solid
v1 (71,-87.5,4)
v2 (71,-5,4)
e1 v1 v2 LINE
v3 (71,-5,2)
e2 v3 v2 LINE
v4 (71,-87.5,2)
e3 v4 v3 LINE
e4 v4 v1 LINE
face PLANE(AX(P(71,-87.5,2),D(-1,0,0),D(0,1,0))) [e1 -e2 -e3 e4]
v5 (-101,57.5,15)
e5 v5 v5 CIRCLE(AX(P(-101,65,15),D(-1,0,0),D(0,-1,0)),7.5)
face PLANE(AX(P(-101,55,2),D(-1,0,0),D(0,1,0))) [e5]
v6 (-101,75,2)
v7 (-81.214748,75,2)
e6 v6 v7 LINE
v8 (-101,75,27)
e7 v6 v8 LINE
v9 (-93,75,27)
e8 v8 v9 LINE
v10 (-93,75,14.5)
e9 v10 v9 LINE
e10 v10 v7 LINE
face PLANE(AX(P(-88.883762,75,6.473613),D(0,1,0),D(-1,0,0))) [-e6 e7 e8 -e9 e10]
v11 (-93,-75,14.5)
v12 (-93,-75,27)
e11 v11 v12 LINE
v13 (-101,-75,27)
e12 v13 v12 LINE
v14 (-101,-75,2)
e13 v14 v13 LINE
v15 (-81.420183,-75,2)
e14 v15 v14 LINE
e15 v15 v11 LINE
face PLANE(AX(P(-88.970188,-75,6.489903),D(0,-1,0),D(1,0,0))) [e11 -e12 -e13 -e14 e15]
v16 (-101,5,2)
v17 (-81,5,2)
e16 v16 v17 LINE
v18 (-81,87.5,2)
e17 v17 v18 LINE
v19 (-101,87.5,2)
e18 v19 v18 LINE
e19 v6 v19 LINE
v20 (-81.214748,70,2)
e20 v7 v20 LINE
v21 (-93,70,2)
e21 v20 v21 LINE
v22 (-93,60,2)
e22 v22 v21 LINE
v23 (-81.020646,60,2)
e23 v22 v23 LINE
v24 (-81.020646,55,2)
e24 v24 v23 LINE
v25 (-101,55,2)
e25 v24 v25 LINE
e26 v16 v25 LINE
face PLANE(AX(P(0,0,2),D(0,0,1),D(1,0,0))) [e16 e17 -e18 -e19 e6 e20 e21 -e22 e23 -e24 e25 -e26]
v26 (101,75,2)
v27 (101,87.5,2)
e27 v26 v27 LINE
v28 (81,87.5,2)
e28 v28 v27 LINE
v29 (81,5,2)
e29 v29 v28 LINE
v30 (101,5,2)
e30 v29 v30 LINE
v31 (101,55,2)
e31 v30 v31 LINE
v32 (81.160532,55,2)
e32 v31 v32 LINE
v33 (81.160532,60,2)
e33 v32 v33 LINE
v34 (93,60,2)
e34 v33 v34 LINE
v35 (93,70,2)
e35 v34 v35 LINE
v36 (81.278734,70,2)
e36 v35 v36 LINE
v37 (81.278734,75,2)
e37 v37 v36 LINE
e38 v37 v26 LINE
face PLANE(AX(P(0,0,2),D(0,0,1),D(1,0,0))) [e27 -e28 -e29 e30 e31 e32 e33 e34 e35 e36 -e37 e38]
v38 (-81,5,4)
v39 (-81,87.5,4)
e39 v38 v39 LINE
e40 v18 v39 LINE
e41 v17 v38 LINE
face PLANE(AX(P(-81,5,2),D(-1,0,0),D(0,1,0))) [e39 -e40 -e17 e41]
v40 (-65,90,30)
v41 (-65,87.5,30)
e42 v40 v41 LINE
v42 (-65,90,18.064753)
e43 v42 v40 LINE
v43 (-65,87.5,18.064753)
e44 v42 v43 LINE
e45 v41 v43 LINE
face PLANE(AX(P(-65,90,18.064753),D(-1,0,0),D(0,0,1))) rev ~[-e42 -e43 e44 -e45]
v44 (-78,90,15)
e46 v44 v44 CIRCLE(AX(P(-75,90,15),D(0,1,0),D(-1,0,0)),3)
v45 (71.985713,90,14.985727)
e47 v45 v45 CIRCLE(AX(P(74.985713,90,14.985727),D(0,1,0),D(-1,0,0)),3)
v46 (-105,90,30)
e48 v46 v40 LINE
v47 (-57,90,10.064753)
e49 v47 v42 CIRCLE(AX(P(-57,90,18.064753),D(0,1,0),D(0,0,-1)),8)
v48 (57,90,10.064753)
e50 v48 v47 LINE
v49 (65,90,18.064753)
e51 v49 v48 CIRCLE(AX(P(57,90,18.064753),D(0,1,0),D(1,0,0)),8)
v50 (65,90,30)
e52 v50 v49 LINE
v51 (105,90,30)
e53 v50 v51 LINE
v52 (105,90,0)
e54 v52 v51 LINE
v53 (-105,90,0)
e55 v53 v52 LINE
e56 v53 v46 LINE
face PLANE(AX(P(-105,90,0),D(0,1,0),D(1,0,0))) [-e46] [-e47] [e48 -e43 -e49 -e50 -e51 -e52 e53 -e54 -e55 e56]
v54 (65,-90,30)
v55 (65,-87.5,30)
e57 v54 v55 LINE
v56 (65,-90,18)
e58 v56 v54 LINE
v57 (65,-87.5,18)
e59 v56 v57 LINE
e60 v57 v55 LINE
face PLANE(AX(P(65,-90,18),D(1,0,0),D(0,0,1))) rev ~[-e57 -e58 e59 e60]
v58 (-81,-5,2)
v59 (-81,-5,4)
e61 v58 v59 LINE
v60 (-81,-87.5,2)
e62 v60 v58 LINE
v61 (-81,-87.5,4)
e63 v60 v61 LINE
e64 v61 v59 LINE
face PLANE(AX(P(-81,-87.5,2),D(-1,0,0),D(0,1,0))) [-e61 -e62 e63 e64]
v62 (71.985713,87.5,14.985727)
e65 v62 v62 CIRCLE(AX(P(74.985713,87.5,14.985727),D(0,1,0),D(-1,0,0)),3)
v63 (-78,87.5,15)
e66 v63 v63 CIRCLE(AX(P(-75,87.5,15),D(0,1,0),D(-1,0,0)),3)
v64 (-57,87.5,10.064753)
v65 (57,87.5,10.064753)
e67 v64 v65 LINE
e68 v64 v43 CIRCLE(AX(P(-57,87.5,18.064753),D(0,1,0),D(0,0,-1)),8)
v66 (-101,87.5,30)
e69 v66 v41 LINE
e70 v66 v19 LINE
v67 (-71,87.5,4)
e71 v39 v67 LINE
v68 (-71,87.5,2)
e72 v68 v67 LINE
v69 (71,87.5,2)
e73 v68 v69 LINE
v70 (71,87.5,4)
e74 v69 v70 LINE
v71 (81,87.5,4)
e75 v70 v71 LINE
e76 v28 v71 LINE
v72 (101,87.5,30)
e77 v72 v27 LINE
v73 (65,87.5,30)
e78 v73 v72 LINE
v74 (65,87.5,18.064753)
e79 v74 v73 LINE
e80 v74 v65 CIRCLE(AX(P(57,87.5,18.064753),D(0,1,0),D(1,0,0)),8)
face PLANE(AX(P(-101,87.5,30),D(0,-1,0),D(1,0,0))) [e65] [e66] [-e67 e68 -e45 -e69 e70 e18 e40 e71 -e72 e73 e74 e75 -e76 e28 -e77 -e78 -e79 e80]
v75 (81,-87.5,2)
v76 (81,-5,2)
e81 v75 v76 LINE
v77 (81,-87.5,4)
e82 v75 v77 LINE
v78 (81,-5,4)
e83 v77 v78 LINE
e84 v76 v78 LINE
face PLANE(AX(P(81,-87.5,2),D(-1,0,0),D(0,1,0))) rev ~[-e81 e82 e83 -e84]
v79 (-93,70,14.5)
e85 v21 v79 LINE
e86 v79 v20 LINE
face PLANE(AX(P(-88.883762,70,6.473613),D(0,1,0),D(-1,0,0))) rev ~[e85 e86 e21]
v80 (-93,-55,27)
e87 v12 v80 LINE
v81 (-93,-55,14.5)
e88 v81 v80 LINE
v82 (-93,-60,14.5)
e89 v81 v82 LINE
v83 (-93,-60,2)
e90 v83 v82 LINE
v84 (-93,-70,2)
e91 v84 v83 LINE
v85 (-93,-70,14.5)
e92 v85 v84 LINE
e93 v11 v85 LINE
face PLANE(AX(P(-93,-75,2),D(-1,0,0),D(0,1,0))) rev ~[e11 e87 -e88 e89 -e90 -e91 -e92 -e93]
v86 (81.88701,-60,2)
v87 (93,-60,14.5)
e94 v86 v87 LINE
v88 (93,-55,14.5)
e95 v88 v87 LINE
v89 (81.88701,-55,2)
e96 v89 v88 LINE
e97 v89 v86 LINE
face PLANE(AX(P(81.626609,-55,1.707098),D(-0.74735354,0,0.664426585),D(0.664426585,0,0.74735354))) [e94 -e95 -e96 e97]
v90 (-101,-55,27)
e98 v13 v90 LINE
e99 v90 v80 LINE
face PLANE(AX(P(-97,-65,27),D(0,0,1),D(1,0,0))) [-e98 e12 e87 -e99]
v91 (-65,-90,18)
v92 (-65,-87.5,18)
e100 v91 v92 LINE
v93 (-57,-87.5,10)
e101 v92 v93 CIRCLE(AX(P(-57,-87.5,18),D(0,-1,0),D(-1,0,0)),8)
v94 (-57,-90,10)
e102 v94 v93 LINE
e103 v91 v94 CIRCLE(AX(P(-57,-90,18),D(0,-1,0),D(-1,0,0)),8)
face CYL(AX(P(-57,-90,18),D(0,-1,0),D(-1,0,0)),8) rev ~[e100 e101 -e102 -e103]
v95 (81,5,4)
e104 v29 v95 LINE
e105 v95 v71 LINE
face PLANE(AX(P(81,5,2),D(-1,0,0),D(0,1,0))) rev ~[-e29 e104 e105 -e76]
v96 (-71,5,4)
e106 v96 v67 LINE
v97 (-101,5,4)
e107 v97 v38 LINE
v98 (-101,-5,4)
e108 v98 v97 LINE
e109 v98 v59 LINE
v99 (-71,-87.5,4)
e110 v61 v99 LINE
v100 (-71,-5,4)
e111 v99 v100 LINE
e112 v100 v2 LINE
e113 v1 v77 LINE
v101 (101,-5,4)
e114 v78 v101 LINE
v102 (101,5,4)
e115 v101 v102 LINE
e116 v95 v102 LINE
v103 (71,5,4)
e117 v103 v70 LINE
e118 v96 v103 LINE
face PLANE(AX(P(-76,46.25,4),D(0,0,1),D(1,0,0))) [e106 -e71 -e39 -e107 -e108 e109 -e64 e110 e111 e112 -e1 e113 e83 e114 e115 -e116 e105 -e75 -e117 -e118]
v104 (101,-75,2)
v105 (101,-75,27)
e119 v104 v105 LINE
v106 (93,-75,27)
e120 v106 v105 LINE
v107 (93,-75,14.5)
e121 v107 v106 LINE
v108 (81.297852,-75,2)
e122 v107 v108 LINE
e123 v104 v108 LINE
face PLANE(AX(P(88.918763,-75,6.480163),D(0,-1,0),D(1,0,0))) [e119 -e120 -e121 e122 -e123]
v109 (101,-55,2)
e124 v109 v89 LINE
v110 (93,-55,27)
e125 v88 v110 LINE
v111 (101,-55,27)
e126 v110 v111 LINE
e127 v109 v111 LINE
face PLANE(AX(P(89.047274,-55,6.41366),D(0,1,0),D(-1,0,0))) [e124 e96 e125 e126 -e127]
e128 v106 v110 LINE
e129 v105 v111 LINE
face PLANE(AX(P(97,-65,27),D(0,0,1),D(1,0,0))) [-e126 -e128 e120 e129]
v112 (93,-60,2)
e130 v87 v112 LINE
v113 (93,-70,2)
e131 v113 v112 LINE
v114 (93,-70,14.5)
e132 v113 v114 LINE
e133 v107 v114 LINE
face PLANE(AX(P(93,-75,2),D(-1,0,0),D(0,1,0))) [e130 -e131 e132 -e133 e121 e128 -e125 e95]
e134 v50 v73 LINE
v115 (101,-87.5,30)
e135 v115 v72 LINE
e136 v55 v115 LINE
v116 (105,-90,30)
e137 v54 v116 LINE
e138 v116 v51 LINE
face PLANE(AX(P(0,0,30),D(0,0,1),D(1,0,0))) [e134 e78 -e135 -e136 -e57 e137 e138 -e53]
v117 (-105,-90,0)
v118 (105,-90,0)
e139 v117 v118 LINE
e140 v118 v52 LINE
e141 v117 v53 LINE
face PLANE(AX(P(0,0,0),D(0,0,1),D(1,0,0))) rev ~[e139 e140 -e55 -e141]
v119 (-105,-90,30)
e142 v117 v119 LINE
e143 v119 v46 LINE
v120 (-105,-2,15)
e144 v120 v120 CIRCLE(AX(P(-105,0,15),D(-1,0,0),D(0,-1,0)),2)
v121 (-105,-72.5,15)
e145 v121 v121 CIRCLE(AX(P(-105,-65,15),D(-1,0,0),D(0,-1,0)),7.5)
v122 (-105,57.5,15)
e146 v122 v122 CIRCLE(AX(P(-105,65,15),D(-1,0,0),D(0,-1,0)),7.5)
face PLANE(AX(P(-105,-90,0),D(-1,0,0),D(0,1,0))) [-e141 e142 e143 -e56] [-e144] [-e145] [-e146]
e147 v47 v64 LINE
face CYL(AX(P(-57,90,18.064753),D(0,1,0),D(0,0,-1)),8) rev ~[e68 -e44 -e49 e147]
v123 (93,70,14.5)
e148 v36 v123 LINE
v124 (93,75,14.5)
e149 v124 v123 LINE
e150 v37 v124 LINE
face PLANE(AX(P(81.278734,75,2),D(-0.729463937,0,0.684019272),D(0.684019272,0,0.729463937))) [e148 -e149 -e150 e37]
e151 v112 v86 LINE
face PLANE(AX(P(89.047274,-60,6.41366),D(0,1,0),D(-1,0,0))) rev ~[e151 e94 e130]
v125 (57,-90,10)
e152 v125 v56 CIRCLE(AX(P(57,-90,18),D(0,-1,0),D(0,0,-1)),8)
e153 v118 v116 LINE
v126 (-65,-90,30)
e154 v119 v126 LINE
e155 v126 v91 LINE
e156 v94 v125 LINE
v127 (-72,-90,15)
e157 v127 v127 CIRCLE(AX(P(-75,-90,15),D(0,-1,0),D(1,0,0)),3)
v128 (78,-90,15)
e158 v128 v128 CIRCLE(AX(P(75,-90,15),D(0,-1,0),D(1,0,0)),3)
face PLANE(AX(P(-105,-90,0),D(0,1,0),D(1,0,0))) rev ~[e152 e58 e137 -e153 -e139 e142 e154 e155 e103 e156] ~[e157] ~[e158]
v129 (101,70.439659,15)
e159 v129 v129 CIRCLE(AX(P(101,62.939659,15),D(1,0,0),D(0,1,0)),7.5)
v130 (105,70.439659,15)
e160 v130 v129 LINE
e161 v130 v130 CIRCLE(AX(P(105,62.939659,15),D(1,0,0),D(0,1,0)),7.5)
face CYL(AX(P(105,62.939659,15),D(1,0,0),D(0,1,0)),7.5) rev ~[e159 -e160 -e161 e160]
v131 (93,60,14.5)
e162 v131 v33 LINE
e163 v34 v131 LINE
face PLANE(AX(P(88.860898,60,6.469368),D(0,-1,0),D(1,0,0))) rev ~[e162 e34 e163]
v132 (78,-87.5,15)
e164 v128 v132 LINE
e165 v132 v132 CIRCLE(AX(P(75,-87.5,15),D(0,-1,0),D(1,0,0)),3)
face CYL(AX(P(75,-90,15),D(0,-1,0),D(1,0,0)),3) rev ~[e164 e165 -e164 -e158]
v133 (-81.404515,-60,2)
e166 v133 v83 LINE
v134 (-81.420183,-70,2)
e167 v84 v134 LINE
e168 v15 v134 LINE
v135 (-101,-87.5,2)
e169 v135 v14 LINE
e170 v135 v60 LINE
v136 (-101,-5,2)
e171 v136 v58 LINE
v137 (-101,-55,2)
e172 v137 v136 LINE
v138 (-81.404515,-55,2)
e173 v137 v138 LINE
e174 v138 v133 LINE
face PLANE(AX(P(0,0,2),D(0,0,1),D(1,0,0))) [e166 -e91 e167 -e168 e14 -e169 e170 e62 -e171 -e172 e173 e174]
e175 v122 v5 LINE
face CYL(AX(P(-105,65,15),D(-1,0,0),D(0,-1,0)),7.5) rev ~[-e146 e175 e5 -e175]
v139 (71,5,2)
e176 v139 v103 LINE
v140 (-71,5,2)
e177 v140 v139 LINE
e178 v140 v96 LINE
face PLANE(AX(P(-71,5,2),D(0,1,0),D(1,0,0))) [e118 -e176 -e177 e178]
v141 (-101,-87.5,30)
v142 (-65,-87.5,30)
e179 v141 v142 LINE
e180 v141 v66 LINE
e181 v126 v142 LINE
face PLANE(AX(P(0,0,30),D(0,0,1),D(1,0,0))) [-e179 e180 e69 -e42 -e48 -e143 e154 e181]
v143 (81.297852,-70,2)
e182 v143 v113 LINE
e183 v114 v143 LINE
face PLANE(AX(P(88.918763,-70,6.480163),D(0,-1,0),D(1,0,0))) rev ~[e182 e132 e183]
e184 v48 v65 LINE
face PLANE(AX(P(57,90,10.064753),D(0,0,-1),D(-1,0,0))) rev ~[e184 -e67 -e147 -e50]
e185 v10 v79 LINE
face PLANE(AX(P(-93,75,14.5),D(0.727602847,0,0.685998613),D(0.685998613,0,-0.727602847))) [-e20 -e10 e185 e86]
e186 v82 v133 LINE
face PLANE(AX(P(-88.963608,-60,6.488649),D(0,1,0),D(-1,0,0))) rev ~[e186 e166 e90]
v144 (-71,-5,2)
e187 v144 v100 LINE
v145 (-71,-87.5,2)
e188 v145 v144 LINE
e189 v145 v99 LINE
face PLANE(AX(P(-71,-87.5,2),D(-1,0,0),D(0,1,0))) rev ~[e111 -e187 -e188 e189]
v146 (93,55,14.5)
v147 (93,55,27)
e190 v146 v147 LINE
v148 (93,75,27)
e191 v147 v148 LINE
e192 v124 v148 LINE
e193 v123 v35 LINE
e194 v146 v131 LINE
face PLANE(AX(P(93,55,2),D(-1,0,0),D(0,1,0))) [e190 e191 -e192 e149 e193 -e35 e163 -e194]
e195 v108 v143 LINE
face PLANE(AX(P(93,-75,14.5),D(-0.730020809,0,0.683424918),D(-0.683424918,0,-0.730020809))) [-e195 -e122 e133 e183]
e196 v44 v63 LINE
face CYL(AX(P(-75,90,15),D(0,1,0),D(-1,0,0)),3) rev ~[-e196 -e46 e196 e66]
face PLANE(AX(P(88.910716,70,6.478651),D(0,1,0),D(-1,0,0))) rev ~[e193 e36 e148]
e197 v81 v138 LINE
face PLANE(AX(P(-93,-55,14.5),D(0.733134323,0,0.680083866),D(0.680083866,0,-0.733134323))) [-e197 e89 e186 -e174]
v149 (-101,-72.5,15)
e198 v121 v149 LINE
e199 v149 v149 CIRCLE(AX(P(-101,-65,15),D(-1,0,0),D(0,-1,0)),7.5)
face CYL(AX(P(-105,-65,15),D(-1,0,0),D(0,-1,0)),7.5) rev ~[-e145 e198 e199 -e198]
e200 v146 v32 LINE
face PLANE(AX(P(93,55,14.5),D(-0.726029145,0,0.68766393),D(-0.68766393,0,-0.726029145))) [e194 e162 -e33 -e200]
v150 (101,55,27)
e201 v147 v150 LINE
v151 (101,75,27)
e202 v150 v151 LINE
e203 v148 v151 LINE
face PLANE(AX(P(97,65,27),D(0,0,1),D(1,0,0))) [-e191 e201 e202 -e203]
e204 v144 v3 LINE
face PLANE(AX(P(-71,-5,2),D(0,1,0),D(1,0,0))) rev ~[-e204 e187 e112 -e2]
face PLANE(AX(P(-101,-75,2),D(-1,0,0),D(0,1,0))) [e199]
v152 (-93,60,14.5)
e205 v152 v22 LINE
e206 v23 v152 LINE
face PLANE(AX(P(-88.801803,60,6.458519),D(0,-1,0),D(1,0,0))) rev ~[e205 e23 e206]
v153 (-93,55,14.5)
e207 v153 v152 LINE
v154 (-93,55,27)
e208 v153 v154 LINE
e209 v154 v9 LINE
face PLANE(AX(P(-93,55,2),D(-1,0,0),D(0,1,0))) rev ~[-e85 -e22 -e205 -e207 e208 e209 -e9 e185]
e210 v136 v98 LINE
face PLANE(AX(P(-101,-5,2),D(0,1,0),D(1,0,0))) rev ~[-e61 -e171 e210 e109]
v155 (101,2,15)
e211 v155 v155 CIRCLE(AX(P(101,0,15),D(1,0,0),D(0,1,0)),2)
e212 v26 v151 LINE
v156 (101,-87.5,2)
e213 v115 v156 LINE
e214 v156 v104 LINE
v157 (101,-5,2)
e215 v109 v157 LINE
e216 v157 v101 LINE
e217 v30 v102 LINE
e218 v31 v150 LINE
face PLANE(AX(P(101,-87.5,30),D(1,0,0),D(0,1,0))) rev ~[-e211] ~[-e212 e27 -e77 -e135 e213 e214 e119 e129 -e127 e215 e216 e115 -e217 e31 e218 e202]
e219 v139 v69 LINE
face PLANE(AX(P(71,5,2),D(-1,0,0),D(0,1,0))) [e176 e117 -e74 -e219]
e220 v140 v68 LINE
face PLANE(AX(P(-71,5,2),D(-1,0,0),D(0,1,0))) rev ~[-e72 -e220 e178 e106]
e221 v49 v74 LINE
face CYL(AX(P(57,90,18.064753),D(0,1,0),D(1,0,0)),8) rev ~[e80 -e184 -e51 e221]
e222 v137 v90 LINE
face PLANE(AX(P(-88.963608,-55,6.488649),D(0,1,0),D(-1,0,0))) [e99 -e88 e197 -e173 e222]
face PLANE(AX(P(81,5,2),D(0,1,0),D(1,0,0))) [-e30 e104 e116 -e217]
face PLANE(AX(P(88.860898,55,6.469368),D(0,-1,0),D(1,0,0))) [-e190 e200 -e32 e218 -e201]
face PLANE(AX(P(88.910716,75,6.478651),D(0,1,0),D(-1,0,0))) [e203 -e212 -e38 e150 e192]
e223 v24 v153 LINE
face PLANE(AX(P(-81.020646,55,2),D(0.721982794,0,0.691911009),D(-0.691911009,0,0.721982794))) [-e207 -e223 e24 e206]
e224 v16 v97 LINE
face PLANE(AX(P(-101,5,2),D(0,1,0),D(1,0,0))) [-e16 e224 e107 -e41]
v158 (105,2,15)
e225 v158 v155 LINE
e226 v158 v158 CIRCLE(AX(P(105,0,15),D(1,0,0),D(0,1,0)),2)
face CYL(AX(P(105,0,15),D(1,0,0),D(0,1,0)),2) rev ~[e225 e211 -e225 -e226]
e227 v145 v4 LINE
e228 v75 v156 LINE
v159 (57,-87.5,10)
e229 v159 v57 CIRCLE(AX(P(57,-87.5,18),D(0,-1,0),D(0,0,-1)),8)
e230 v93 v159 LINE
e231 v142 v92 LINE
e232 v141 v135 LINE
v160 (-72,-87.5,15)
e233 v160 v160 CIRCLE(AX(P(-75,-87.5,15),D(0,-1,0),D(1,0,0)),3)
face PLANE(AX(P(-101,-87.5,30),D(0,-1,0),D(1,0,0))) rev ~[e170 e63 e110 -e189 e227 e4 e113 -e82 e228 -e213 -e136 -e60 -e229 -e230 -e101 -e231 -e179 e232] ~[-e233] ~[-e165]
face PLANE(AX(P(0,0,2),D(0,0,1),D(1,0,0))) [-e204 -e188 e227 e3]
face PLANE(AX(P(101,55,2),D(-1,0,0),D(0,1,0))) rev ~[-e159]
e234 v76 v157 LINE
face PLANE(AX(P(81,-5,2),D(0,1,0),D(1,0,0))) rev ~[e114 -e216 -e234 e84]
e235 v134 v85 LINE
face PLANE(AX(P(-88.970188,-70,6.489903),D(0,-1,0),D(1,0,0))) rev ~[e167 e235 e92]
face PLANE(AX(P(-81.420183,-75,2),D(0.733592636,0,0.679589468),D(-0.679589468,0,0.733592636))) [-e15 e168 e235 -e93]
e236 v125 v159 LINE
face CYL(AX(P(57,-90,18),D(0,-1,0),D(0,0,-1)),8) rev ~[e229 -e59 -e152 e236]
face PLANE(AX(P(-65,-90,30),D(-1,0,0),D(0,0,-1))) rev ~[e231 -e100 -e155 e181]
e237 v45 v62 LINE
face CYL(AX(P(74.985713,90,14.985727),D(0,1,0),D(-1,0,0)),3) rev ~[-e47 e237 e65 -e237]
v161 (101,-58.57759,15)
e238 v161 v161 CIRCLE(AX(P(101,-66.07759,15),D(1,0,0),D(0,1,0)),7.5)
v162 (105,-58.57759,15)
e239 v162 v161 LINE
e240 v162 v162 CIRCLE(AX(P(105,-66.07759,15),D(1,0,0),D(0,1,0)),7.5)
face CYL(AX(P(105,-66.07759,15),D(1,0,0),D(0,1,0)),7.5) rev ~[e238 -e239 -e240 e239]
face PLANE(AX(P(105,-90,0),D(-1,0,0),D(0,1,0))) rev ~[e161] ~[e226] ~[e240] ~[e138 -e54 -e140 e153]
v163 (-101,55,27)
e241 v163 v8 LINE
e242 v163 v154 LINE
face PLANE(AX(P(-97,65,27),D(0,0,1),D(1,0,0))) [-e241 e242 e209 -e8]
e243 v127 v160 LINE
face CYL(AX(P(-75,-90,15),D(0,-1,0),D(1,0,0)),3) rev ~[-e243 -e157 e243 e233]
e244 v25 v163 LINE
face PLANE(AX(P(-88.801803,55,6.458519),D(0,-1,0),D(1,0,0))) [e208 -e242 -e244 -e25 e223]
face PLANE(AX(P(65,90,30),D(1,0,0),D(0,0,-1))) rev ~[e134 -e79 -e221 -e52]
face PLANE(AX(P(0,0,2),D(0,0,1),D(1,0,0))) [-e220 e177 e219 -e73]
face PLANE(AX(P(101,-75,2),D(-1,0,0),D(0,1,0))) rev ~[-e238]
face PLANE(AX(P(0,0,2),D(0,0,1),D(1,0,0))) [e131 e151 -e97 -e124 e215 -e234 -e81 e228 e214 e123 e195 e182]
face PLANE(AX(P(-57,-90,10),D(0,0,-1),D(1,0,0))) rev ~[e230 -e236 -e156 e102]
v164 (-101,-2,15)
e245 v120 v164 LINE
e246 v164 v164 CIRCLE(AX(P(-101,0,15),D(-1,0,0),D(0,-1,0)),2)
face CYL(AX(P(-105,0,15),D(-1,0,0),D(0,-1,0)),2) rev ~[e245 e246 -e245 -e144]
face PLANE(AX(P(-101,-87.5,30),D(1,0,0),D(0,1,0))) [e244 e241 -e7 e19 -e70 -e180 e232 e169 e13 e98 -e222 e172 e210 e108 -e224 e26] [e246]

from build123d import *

# Parameters (mm, degrees)
F0_W      = 210
F0_H      = 180
F1_DEPTH  = 30
F2_W      = 202
F2_H      = 175
F3_DEPTH  = 28
F4_R      = 3
F5_DEPTH  = 4
F6_W      = 10
F6_H      = 82.5
F6_W_2    = 20
F6_H_2    = 10
F6_W_3    = 142
F7_DEPTH  = 2
F8_R      = 2
F9_DEPTH  = 5
F10_R     = 2
F10_R_2   = 7.5
F11_DEPTH = 5
F12_R     = 7.5
F13_DEPTH = 5
F14_W     = 8
F14_H     = 20
F15_DEPTH = 25
F17_DEPTH = 5
F19_DEPTH = 5
F21_DEPTH = 5
F23_DEPTH = 5
F25_DEPTH = 5
F27_DEPTH = 5
F30_DEPTH = 5
F32_DEPTH = 5
F33_R     = 3
F34_DEPTH = 4


# Not quite as in the source:
# - a feature names something its author has since deleted; it is built from what else it names


with BuildPart() as f1:
    # F0 (on Top) → F1 (new body)
    with BuildSketch(Plane.XY):
        Rectangle(F0_W, F0_H)
    extrude(amount=F1_DEPTH)

    # F2 (on face) → F3 (cut)
    with BuildSketch(Plane.XY.offset(30)):
        Rectangle(F2_W, F2_H)
    extrude(amount=-F3_DEPTH, mode=Mode.SUBTRACT)

    # F4 (on face) → F5 (cut)
    with BuildSketch(Plane.XZ.offset(90)):
        with BuildLine():
            Line((-57, 10), (-15, 10))
            Line((-15, 10), (15, 10))
            Line((15, 10), (57, 10))
            ThreePointArc((57, 10), (62.6568542495, 12.3431457505), (65, 18))
            Line((65, 18), (65, 30))
            Line((65, 30), (-65, 30))
            Line((-65, 30), (-65, 18))
            ThreePointArc((-65, 18), (-62.6568542495, 12.3431457505), (-57, 10))
        make_face()
        with Locations((-75, 15)):
            Circle(F4_R)
        with Locations((75, 15)):
            Circle(F4_R)
    extrude(amount=-F5_DEPTH, mode=Mode.SUBTRACT)

    # F8 (on face) → F9 (cut)
    with BuildSketch(Plane.YZ.offset(105)):
        with Locations((0, 15)):
            Circle(F8_R)
    extrude(amount=-F9_DEPTH, mode=Mode.SUBTRACT)

    # F10 (on face) → F11 (cut)
    with BuildSketch(Plane(origin=(-105, 0, 0), x_dir=(0, -1, 0), z_dir=(-1, 0, 0))):
        with Locations((0, 15)):
            Circle(F10_R)
        with Locations((-65, 15)):
            Circle(F10_R_2)
        with Locations((65, 15)):
            Circle(F10_R_2)
    extrude(amount=-F11_DEPTH, mode=Mode.SUBTRACT)

    # F12 (on face) → F13 (cut)
    with BuildSketch(Plane.YZ.offset(105)):
        with Locations((-66.0775899887, 15)):
            Circle(F12_R)
        with Locations((62.939658761, 15)):
            Circle(F12_R)
    extrude(amount=-F13_DEPTH, mode=Mode.SUBTRACT)

    # F14 (on face) → F15 (join)
    with BuildSketch(Plane.XY.offset(2)):
        with Locations((-97, 65)):
            Rectangle(F14_W, F14_H)
        with Locations((-97, -65)):
            Rectangle(F14_W, F14_H)
        with Locations((97, 65)):
            Rectangle(F14_W, F14_H)
        with Locations((97, -65)):
            Rectangle(F14_W, F14_H)
    extrude(amount=F15_DEPTH)

    # F16 (on face) → F17 (join)
    with BuildSketch(Plane(origin=(0, -55, 0), x_dir=(-1, 0, 0), z_dir=(0, 1, 0))):
        Polygon((-93, 2), (-81.6266089678, 1.707098214), (-93, 14.5), align=None)
    extrude(amount=-F17_DEPTH)

    # F18 (on face) → F19 (join)
    with BuildSketch(Plane.XZ.offset(-55)):
        Polygon((-93, 14.5), (-93, 2), (-81.0206457973, 2), align=None)
    extrude(amount=-F19_DEPTH)

    # F20 (on face) → F21 (join)
    with BuildSketch(Plane.XZ.offset(-55)):
        Polygon((81.1605315804, 2), (93, 2), (93, 14.5), align=None)
    extrude(amount=-F21_DEPTH)

    # F22 (on face) → F23 (join)
    with BuildSketch(Plane(origin=(0, -55, 0), x_dir=(-1, 0, 0), z_dir=(0, 1, 0))):
        Polygon((81.4045146108, 2), (93, 2), (93, 14.5), align=None)
    extrude(amount=-F23_DEPTH)

    # F24 (on face) → F25 (join)
    with BuildSketch(Plane(origin=(0, 75, 0), x_dir=(-1, 0, 0), z_dir=(0, 1, 0))):
        Polygon((81.214748323, 2), (93, 2), (93, 14.5), align=None)
    extrude(amount=-F25_DEPTH)

    # F26 (on face) → F27 (join)
    with BuildSketch(Plane.XZ.offset(75)):
        Polygon((81.2978520989, 2), (93, 2), (93, 14.5), align=None)
    extrude(amount=-F27_DEPTH)


with BuildPart() as f7:
    # F6 (on face) → F7 (new body)
    with BuildSketch(Plane.XY.offset(2)):
        with Locations((-76, 46.25)):
            Rectangle(F6_W, F6_H)
        with Locations((76, 46.25)):
            Rectangle(F6_W, F6_H)
        with Locations((-91, 0)):
            Rectangle(F6_W_2, F6_H_2)
        with Locations((-76, 0)):
            Rectangle(F6_W, F6_H_2)
        with Locations((-76, -46.25)):
            Rectangle(F6_W, F6_H)
        Rectangle(F6_W_3, F6_H_2)
        with Locations((76, 0)):
            Rectangle(F6_W, F6_H_2)
        with Locations((76, -46.25)):
            Rectangle(F6_W, F6_H)
        with Locations((91, 0)):
            Rectangle(F6_W_2, F6_H_2)
    extrude(amount=F7_DEPTH)


with BuildPart() as f1_1:
    add(f1.part)

    # F28: union F7
    add(f7.part)

    # F29 (on face) → F30 (join)
    with BuildSketch(Plane.XZ.offset(75)):
        Polygon((-93, 14.5), (-93, 2), (-81.4201831818, 2), align=None)
    extrude(amount=-F30_DEPTH)

    # F31 (on face) → F32 (join)
    with BuildSketch(Plane(origin=(0, 75, 0), x_dir=(-1, 0, 0), z_dir=(0, 1, 0))):
        Polygon((-93, 14.5), (-93, 2), (-81.2787339091, 2), align=None)
    extrude(amount=-F32_DEPTH)

    # F33 (on face) → F34 (cut)
    with BuildSketch(Plane(origin=(0, 90, 0), x_dir=(-1, 0, 0), z_dir=(0, 1, 0))):
        with BuildLine():
            Line((-57, 10.0647527289), (-15, 10.0647527289))
            Line((-15, 10.0647527289), (15, 10.0647527289))
            Line((15, 10.0647527289), (57, 10.0647527289))
            ThreePointArc((57, 10.0647527289), (62.6568542495, 12.4078984794), (65, 18.0647527289))
            Line((65, 18.0647527289), (65, 30))
            Line((65, 30), (-65, 30))
            Line((-65, 30), (-65, 18.0647527289))
            ThreePointArc((-65, 18.0647527289), (-62.6568542495, 12.4078984794), (-57, 10.0647527289))
        make_face()
        with Locations((-74.9857133275, 14.9857269089)):
            Circle(F33_R)
        with Locations((75, 15)):
            Circle(F33_R)
    extrude(amount=-F34_DEPTH, mode=Mode.SUBTRACT)


solid = f1_1.part
